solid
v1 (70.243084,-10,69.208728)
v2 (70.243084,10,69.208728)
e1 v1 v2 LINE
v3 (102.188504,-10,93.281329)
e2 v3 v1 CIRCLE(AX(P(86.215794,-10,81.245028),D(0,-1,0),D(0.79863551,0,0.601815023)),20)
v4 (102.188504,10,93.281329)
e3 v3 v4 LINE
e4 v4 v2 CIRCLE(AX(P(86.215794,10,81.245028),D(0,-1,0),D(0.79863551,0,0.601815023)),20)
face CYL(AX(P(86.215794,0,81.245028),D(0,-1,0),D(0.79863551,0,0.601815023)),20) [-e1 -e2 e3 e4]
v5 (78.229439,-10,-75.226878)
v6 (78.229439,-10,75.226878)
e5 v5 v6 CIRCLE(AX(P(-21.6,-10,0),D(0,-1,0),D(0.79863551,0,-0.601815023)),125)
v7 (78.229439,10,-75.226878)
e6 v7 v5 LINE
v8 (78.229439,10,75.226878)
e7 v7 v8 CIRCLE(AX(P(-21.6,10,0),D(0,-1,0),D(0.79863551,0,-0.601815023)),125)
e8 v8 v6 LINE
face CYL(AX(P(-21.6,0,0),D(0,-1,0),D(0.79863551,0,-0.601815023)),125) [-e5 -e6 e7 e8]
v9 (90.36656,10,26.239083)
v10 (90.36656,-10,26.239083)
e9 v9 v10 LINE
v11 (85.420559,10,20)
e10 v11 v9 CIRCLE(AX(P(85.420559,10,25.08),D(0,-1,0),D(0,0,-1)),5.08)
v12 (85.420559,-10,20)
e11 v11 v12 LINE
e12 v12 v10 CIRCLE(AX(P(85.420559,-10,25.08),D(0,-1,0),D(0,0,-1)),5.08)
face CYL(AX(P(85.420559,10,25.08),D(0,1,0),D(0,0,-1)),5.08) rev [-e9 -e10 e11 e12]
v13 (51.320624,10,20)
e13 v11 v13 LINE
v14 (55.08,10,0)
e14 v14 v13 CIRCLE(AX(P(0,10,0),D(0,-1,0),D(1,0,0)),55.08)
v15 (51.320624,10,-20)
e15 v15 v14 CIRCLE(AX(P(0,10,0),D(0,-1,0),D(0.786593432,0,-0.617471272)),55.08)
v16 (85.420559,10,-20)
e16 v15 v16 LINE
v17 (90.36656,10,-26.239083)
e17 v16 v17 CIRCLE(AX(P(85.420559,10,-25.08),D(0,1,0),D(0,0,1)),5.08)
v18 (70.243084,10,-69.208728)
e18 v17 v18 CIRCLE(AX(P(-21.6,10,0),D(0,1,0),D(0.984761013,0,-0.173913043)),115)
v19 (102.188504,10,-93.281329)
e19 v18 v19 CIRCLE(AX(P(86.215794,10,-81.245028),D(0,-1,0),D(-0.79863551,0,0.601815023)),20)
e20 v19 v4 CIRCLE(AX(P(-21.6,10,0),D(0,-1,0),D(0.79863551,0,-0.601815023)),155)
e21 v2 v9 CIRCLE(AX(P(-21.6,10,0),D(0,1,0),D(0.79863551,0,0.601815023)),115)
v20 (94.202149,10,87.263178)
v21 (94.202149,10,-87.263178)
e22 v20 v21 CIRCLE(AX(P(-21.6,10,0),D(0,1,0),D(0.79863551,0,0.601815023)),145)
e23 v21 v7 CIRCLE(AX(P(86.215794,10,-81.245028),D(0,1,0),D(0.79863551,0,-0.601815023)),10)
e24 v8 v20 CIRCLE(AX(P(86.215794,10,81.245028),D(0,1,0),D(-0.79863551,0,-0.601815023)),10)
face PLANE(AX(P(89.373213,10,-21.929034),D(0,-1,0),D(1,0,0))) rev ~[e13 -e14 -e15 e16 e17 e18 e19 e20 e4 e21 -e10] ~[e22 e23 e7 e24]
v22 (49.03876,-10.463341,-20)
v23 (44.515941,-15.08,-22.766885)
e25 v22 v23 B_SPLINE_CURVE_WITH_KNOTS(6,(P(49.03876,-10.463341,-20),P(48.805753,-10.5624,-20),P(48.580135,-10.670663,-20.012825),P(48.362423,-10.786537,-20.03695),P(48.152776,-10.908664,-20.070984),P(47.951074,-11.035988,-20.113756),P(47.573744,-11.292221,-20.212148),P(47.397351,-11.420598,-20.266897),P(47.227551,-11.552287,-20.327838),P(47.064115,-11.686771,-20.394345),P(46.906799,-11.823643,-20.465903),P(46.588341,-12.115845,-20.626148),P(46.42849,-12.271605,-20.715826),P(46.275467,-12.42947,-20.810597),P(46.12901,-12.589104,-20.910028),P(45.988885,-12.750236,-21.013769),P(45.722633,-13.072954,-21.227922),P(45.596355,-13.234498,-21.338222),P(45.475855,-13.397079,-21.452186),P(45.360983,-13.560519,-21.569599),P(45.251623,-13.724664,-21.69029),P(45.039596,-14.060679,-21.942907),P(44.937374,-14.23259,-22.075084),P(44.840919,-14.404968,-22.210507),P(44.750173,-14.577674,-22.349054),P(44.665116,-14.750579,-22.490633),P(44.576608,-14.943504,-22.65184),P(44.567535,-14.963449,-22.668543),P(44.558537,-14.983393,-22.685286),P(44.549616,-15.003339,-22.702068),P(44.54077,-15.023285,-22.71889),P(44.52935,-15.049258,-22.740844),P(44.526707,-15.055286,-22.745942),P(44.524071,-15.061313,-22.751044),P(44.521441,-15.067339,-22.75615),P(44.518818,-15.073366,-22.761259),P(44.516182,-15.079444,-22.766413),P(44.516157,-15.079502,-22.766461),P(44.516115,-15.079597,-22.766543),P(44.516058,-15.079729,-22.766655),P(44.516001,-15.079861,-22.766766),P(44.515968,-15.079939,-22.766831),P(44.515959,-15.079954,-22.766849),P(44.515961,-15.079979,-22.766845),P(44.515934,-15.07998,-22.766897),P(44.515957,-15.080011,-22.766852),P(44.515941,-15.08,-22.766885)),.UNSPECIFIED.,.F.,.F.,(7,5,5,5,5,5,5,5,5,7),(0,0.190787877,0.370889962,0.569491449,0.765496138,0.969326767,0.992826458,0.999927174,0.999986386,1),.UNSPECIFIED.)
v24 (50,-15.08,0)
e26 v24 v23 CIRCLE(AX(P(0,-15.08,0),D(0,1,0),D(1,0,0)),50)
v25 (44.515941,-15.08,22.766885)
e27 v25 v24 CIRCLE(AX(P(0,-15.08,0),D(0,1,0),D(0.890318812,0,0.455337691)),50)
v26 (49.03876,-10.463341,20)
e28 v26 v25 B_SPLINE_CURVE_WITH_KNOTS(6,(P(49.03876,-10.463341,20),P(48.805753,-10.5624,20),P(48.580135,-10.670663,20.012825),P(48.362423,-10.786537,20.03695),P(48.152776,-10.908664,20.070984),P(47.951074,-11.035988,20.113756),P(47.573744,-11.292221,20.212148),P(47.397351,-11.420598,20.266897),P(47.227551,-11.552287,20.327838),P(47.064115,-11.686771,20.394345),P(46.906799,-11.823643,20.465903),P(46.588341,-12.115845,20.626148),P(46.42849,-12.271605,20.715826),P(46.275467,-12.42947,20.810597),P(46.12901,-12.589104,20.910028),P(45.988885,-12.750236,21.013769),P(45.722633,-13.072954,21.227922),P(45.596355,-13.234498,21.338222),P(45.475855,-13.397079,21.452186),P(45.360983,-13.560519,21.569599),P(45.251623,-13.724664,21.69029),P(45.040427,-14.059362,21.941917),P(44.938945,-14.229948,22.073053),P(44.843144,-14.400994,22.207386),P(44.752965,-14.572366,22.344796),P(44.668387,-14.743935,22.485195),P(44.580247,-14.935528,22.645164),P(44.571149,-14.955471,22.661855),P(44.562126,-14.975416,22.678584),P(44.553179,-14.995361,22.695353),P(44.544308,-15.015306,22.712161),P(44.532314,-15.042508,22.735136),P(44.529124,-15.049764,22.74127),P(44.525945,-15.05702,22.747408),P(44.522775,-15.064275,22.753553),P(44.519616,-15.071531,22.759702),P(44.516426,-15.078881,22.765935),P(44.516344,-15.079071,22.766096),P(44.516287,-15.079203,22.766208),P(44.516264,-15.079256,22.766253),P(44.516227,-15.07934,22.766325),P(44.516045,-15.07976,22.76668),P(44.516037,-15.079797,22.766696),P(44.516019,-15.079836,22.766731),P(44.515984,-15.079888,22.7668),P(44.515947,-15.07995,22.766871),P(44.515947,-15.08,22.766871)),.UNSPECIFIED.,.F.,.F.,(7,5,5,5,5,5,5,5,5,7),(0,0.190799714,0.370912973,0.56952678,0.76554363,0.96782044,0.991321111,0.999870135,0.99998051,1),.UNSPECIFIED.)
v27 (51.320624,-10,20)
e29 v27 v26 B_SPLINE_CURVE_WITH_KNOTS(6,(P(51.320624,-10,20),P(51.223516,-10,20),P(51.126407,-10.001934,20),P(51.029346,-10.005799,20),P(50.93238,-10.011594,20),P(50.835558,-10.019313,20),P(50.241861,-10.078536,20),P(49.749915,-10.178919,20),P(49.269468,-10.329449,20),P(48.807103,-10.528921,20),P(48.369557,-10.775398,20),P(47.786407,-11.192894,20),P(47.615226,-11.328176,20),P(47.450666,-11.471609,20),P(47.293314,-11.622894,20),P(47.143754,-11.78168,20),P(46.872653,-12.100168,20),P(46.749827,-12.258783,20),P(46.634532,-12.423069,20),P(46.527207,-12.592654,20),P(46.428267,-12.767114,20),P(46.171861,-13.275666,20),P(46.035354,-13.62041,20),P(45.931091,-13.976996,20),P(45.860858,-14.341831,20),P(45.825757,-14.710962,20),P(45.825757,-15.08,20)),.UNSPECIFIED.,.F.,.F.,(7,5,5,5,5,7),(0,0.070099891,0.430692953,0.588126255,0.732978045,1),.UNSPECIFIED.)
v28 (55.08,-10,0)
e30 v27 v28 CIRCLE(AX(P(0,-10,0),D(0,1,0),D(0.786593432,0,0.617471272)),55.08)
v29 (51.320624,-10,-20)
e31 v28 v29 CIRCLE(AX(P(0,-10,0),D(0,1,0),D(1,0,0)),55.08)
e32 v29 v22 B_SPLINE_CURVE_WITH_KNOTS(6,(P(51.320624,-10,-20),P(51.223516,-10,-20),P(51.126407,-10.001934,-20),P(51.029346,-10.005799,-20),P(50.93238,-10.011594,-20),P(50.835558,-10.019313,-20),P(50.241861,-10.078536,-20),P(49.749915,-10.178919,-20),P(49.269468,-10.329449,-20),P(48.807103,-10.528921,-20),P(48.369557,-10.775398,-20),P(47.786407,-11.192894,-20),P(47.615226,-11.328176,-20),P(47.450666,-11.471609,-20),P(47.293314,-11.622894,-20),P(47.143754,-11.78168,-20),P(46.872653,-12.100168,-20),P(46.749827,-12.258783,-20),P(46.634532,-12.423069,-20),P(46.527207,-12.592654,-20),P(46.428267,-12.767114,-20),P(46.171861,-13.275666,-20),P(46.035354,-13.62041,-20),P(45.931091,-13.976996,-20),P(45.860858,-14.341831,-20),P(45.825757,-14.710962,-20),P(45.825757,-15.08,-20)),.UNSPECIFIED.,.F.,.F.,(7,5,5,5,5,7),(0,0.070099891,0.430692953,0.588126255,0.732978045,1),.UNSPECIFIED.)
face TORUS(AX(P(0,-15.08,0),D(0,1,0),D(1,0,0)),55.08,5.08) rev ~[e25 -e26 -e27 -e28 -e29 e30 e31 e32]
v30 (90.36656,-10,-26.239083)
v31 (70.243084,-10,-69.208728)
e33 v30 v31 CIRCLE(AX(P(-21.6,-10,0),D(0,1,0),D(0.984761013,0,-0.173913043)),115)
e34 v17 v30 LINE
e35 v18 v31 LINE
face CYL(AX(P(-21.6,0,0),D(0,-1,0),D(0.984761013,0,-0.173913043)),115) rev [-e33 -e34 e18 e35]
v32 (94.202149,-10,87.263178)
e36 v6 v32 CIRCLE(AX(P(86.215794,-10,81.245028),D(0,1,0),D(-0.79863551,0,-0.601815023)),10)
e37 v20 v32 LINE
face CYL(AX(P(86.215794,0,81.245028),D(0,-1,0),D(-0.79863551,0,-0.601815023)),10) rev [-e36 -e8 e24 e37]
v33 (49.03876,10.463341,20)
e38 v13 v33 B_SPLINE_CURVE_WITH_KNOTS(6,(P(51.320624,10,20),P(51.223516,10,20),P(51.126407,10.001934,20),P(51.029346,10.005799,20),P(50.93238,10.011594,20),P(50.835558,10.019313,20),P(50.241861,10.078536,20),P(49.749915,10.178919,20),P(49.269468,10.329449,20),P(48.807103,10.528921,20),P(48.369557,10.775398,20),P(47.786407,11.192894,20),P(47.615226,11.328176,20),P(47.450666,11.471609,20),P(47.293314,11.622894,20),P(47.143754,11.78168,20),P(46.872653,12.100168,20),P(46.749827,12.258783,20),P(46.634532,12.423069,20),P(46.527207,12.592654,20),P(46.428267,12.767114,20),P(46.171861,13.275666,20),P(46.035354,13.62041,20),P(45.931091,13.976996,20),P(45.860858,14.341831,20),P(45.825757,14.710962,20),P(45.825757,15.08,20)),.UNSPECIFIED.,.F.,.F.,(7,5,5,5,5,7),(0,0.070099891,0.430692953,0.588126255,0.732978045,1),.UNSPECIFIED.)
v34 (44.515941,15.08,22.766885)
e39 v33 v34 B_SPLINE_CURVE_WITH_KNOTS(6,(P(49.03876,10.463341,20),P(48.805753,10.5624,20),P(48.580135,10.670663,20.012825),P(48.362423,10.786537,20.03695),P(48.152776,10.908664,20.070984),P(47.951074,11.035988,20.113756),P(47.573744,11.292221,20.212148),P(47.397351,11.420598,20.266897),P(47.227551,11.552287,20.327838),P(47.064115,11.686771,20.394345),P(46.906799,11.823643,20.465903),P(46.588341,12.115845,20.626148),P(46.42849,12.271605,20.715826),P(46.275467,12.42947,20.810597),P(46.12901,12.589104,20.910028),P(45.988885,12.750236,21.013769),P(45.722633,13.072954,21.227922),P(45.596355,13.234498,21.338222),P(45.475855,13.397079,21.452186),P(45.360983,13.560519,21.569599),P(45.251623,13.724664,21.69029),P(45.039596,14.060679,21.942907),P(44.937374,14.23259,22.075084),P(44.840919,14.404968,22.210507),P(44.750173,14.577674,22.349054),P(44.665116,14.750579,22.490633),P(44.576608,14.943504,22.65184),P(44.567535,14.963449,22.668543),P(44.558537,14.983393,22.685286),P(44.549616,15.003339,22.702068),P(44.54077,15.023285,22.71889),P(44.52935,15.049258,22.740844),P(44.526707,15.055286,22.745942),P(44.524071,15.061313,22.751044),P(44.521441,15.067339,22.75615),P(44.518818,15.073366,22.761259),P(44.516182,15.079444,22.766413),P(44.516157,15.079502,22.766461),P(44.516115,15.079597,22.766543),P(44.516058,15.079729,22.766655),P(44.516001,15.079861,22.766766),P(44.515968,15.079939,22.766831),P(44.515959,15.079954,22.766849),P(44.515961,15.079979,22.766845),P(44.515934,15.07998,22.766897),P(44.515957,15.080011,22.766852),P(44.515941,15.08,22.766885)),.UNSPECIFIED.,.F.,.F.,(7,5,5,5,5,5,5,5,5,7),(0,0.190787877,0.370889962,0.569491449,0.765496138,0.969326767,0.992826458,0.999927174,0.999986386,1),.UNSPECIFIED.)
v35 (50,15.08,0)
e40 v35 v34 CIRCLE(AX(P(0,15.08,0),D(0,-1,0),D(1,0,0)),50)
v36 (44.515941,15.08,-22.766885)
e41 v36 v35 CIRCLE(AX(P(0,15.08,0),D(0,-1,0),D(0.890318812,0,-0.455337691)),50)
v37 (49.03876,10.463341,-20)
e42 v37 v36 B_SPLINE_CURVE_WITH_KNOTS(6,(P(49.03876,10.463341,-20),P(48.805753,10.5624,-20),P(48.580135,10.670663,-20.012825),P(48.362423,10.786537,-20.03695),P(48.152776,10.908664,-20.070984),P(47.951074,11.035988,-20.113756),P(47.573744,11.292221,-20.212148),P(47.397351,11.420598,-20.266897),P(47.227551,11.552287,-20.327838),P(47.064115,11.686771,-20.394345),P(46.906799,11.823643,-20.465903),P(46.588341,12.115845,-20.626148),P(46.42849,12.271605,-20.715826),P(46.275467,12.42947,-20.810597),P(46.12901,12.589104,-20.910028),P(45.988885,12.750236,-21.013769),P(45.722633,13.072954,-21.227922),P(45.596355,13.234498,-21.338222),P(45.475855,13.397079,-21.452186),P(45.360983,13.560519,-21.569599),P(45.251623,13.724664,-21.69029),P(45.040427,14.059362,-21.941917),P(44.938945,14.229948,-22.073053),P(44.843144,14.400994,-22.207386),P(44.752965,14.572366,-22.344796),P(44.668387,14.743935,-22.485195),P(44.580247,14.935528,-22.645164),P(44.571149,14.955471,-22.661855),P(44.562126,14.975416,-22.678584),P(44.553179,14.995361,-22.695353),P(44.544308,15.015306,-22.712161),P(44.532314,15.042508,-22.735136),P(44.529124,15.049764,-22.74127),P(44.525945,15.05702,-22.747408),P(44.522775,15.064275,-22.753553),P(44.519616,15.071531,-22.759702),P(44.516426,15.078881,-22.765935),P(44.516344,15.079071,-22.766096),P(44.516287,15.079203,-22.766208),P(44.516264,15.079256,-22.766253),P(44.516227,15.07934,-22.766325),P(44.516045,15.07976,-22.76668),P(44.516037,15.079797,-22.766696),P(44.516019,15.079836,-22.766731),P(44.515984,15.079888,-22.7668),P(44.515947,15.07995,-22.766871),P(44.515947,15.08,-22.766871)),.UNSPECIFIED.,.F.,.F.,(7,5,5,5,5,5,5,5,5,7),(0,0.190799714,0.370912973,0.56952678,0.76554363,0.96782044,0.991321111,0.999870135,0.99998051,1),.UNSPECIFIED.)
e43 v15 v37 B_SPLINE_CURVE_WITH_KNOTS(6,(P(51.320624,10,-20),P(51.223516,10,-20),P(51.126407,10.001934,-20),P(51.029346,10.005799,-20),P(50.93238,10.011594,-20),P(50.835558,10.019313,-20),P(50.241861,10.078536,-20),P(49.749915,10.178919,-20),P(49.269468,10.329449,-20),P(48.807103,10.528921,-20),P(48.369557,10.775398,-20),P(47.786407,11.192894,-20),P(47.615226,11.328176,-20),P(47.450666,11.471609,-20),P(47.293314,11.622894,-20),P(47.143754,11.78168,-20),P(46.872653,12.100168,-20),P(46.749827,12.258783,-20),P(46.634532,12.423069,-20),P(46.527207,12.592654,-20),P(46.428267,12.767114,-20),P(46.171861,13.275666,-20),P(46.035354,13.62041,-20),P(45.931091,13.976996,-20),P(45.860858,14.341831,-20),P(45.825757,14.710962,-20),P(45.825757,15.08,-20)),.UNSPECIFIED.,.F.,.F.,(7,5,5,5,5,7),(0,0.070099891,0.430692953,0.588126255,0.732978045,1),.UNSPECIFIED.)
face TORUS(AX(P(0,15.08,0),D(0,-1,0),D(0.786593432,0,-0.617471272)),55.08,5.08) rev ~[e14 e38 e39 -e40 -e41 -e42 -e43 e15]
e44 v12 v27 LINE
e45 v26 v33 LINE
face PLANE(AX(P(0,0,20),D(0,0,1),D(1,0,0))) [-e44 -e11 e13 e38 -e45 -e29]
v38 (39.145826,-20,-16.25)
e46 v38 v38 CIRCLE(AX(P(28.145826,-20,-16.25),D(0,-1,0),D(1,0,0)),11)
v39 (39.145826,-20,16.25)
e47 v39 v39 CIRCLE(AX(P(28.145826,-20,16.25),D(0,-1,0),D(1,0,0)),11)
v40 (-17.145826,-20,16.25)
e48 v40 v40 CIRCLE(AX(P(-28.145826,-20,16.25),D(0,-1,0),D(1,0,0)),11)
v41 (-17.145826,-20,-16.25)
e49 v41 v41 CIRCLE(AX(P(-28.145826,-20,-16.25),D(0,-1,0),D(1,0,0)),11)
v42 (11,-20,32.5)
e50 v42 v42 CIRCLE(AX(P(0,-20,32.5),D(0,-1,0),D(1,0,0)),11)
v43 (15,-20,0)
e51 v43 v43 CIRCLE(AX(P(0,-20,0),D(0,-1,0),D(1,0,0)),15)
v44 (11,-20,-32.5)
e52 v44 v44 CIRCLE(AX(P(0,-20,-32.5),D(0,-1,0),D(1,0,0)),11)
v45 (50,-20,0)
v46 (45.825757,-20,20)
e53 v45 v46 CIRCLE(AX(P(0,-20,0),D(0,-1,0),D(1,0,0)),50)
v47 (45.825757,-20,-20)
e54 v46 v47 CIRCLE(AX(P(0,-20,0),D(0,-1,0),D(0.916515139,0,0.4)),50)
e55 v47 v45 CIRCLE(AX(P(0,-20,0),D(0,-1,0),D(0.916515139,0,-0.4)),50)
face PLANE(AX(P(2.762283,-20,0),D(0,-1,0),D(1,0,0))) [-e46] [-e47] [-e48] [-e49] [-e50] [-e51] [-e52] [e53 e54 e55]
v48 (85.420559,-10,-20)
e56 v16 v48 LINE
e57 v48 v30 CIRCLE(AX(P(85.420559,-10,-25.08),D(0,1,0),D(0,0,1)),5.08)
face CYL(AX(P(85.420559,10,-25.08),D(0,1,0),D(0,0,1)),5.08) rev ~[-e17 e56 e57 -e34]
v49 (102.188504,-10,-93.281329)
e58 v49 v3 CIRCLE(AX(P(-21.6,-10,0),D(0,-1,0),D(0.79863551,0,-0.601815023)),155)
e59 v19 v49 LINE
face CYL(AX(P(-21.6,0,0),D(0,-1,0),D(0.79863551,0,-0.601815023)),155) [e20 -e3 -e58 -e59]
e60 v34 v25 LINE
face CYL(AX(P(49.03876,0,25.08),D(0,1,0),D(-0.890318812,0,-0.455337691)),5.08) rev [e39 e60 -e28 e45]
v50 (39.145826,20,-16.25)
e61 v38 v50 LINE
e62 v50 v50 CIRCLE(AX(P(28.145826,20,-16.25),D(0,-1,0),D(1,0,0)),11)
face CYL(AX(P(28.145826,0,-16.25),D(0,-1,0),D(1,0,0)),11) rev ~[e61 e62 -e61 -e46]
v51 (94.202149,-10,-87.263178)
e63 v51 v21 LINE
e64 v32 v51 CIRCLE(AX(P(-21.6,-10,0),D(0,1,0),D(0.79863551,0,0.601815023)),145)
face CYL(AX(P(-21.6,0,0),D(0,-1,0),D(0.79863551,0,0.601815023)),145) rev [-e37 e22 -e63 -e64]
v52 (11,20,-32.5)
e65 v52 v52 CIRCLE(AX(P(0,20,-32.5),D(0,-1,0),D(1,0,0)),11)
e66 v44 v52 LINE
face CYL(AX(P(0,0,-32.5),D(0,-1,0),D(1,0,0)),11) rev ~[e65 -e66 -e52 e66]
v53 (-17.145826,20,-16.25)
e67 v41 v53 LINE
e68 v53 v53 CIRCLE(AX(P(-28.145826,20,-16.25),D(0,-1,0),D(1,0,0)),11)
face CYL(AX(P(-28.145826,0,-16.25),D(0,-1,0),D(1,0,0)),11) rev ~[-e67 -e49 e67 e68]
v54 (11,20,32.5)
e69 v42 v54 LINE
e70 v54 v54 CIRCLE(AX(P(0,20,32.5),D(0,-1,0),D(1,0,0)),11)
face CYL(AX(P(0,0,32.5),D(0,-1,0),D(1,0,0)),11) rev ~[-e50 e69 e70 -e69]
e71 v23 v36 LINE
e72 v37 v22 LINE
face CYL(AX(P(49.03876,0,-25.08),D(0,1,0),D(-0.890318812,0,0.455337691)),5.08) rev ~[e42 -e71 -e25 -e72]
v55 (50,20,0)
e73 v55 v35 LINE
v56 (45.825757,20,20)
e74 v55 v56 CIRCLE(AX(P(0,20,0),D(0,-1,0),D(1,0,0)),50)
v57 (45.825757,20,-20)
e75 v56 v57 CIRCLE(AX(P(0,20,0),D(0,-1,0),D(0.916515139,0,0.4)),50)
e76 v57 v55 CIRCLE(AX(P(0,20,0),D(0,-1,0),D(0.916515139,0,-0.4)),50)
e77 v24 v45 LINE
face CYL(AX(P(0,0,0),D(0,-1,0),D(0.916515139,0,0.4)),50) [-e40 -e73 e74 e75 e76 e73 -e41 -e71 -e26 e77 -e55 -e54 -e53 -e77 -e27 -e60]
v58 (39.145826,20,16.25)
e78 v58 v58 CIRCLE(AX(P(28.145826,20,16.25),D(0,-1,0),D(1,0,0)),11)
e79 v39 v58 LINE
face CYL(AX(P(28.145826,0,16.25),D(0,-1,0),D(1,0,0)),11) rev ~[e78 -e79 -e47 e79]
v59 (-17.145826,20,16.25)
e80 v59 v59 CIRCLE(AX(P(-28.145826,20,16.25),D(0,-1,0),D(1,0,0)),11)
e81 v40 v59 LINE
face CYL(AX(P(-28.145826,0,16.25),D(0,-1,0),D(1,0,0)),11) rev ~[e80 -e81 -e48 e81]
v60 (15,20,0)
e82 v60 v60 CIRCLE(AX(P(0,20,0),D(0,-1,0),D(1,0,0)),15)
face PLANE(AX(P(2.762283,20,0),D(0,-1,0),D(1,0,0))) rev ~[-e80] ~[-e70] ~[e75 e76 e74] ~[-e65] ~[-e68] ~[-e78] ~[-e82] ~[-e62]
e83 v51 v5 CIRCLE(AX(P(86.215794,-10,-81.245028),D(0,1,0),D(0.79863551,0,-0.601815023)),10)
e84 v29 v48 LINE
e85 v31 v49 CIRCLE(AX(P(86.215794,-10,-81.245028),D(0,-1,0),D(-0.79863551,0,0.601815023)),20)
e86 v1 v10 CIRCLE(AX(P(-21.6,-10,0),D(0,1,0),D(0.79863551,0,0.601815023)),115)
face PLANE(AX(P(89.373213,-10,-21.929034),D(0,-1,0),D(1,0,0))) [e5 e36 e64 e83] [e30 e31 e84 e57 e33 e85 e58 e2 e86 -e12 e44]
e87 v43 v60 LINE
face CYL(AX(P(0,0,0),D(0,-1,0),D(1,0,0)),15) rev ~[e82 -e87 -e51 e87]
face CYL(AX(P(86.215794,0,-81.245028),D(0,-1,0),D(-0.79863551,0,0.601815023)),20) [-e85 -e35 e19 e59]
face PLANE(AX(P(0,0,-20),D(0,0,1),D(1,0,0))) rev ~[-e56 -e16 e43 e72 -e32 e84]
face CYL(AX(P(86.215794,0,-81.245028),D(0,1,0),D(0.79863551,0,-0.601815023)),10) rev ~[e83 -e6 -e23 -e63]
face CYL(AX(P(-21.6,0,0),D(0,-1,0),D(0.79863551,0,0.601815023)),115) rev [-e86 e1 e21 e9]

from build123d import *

# Parameters (mm, degrees)
F0_R         = 11
F0_R_2       = 15
F1_DEPTH     = 20
F2_DEPTH     = 10
F3_T1_DEPTH  = 10
F3_T3_DEPTH  = 10
F3_T5_DEPTH  = 20
F3_T10_ANGLE = 38.1317076079
F3_T15_ANGLE = 38.1317076079
F3_T20_ANGLE = 38.1317076079
F3_T25_ANGLE = 38.1317076079
F3_T31_DEPTH = 18.0325080763
F3_T35_ANGLE = 38.1317076079
F3_T42_DEPTH = 18.0325080763
F3_T46_ANGLE = 38.1317076079
F3_T53_DEPTH = 18.0325080763
F3_T57_ANGLE = 38.1317076079
F3_T64_DEPTH = 18.0325080763
F3_T68_ANGLE = 38.1317076079


# Not quite as in the source:
# - a fillet or chamfer that OpenCascade refuses, or shapes differently, is made with other operations: its cross-section is extruded or revolved along the edge and cut away or added


with BuildPart() as f1:
    # F0 (on Front) → F1 (new body, symmetric)
    with BuildSketch(Plane.XZ):
        with BuildLine():
            ThreePointArc((45.8257569496, -20), (48.9453156465, -10.2154821845), (50, 0))
            ThreePointArc((50, 0), (48.9453156465, 10.2154821845), (45.8257569496, 20))
            ThreePointArc((45.8257569496, 20), (-50, 0), (45.8257569496, -20))
        make_face()
        with Locations((-28.145825623, -16.25)):
            Circle(F0_R, mode=Mode.SUBTRACT)
        with Locations((0, -32.5)):
            Circle(F0_R, mode=Mode.SUBTRACT)
        with Locations((28.145825623, -16.25)):
            Circle(F0_R, mode=Mode.SUBTRACT)
        with Locations((-28.145825623, 16.25)):
            Circle(F0_R, mode=Mode.SUBTRACT)
        Circle(F0_R_2, mode=Mode.SUBTRACT)
        with Locations((28.145825623, 16.25)):
            Circle(F0_R, mode=Mode.SUBTRACT)
        with Locations((0, 32.5)):
            Circle(F0_R, mode=Mode.SUBTRACT)
    extrude(amount=F1_DEPTH, both=True)

    # F0 (on Front) → F2 (join, symmetric)
    with BuildSketch(Plane.XZ):
        with BuildLine():
            ThreePointArc((45.8257569496, -20), (48.9453156465, -10.2154821845), (50, 0))
            ThreePointArc((50, 0), (48.9453156465, 10.2154821845), (45.8257569496, 20))
            ThreePointArc((45.8257569496, 20), (-50, 0), (45.8257569496, -20))
        make_face()
        with Locations((-28.145825623, -16.25)):
            Circle(F0_R, mode=Mode.SUBTRACT)
        with Locations((0, -32.5)):
            Circle(F0_R, mode=Mode.SUBTRACT)
        with Locations((28.145825623, -16.25)):
            Circle(F0_R, mode=Mode.SUBTRACT)
        with Locations((-28.145825623, 16.25)):
            Circle(F0_R, mode=Mode.SUBTRACT)
        Circle(F0_R_2, mode=Mode.SUBTRACT)
        with Locations((28.145825623, 16.25)):
            Circle(F0_R, mode=Mode.SUBTRACT)
        with Locations((0, 32.5)):
            Circle(F0_R, mode=Mode.SUBTRACT)
        with BuildLine():
            ThreePointArc((45.8257569496, 20), (48.9453156465, 10.2154821845), (50, 0))
            ThreePointArc((50, 0), (48.9453156465, -10.2154821845), (45.8257569496, -20))
            Line((45.8257569496, -20), (91.6475165291, -20))
            ThreePointArc((91.6475165291, -20), (83.8557409084, -45.8703249329), (70.2430836554, -69.2087276625))
            ThreePointArc((70.2430836554, -69.2087276625), (74.1794933933, -97.2177383265), (102.1885040573, -93.2813285886))
            ThreePointArc((102.1885040573, -93.2813285886), (133.4, 0), (102.1885040573, 93.2813285886))
            ThreePointArc((102.1885040573, 93.2813285886), (74.1794933933, 97.2177383265), (70.2430836554, 69.2087276625))
            ThreePointArc((70.2430836554, 69.2087276625), (83.8557409084, 45.8703249329), (91.6475165291, 20))
            Line((91.6475165291, 20), (45.8257569496, 20))
        make_face()
        with BuildLine():
            ThreePointArc((94.2021489569, -87.263178357), (80.1976436249, -89.231383226), (78.2294387559, -75.226877894))
            ThreePointArc((78.2294387559, -75.226877894), (103.4, 0), (78.2294387559, 75.226877894))
            ThreePointArc((78.2294387559, 75.226877894), (80.1976436249, 89.231383226), (94.2021489569, 87.263178357))
            ThreePointArc((94.2021489569, 87.263178357), (123.4, 0), (94.2021489569, -87.263178357))
        make_face(mode=Mode.SUBTRACT)
    extrude(amount=F2_DEPTH, both=True)

    # F3: fillet of radius 5.08 on 10 edges, made by hand

    # F3_s2 → F3_t1 (join)
    with BuildSketch(Plane.XZ.offset(-10)):
        with BuildLine():
            ThreePointArc((44.5159406137, 22.7668845316), (46.3877440145, 20.7465818007), (49.0387601801, 20))
            Line((49.0387601801, 20), (45.8257569496, 20))
            ThreePointArc((45.8257569496, 20), (45.1920290777, 21.3934688128), (44.5159406137, 22.7668845316))
        make_face()
        with BuildLine():
            ThreePointArc((44.5159406137, -22.7668845316), (46.3877440145, -20.7465818007), (49.0387601801, -20))
            Line((49.0387601801, -20), (45.8257569496, -20))
            ThreePointArc((45.8257569496, -20), (45.1920290777, -21.3934688128), (44.5159406137, -22.7668845316))
        make_face()
    extrude(amount=F3_T1_DEPTH)

    # F3_s4 → F3_t3 (join)
    with BuildSketch(Plane.XZ):
        with BuildLine():
            ThreePointArc((44.5159406137, 22.7668845316), (46.3877440145, 20.7465818007), (49.0387601801, 20))
            Line((49.0387601801, 20), (45.8257569496, 20))
            ThreePointArc((45.8257569496, 20), (45.1920290777, 21.3934688128), (44.5159406137, 22.7668845316))
        make_face()
        with BuildLine():
            ThreePointArc((44.5159406137, -22.7668845316), (46.3877440145, -20.7465818007), (49.0387601801, -20))
            Line((49.0387601801, -20), (45.8257569496, -20))
            ThreePointArc((45.8257569496, -20), (45.1920290777, -21.3934688128), (44.5159406137, -22.7668845316))
        make_face()
    extrude(amount=F3_T3_DEPTH)

    # F3_s6 → F3_t5 (join)
    with BuildSketch(Plane.XZ.offset(-10)):
        with BuildLine():
            ThreePointArc((85.4205587726, -20), (89.4014218376, -21.924191188), (90.3665598512, -26.2390829694))
            ThreePointArc((90.3665598512, -26.2390829694), (91.0502400753, -23.1284113368), (91.6475165291, -20))
            Line((91.6475165291, -20), (85.4205587726, -20))
        make_face()
        with BuildLine():
            ThreePointArc((85.4205587726, 20), (89.4014218376, 21.924191188), (90.3665598512, 26.2390829694))
            ThreePointArc((90.3665598512, 26.2390829694), (91.0502400753, 23.1284113368), (91.6475165291, 20))
            Line((91.6475165291, 20), (85.4205587726, 20))
        make_face()
    extrude(amount=F3_T5_DEPTH)


with BuildPart() as f3_tool8:
    # F3_s9 → F3_t10 (revolve)
    with BuildSketch(Plane(origin=(0, 0, 0), x_dir=(0, 1, 0), z_dir=(-0.6174712722, 0, -0.7865934325))):
        with BuildLine():
            ThreePointArc((10, 55.08), (11.4878975516, 51.4878975516), (15.08, 50))
            Line((15.08, 50), (10, 50))
            Line((10, 50), (10, 55.08))
        make_face()
    revolve(axis=Axis((0, 10, 0), (0, -1, 0)), revolution_arc=F3_T10_ANGLE)

    split(bisect_by=Plane.XY.offset(-20), keep=Keep.TOP)


with BuildPart() as f1_1:
    add(f1.part)

    # F3_t7: union F3_tool8
    add(f3_tool8.part)


with BuildPart() as f3_tool13:
    # F3_s14 → F3_t15 (revolve)
    with BuildSketch(Plane.XY):
        with BuildLine():
            ThreePointArc((55.08, 10), (51.4878975516, 11.4878975516), (50, 15.08))
            Line((50, 15.08), (50, 10))
            Line((50, 10), (55.08, 10))
        make_face()
    revolve(axis=Axis((0, 10, 0), (0, -1, 0)), revolution_arc=F3_T15_ANGLE)

    split(bisect_by=Plane.XY.offset(20), keep=Keep.BOTTOM)


with BuildPart() as f1_2:
    add(f1_1.part)

    # F3_t12: union F3_tool13
    add(f3_tool13.part)


with BuildPart() as f3_tool18:
    # F3_s19 → F3_t20 (revolve)
    with BuildSketch(Plane.XY):
        with BuildLine():
            ThreePointArc((55.08, -10), (51.4878975516, -11.4878975516), (50, -15.08))
            Line((50, -15.08), (50, -10))
            Line((50, -10), (55.08, -10))
        make_face()
    revolve(axis=Axis((0, -10, 0), (0, 1, 0)), revolution_arc=F3_T20_ANGLE)

    split(bisect_by=Plane.XY.offset(-20), keep=Keep.TOP)


with BuildPart() as f1_3:
    add(f1_2.part)

    # F3_t17: union F3_tool18
    add(f3_tool18.part)


with BuildPart() as f3_tool23:
    # F3_s24 → F3_t25 (revolve)
    with BuildSketch(Plane(origin=(0, 0, 0), x_dir=(0, 1, 0), z_dir=(-0.6174712722, 0, 0.7865934325))):
        with BuildLine():
            ThreePointArc((-10, -55.08), (-11.4878975516, -51.4878975516), (-15.08, -50))
            Line((-15.08, -50), (-10, -50))
            Line((-10, -50), (-10, -55.08))
        make_face()
    revolve(axis=Axis((0, -10, 0), (0, 1, 0)), revolution_arc=F3_T25_ANGLE)

    split(bisect_by=Plane.XY.offset(20), keep=Keep.BOTTOM)


with BuildPart() as f1_4:
    add(f1_3.part)

    # F3_t22: union F3_tool23
    add(f3_tool23.part)


with BuildPart() as f3_tool29:
    # F3_s30 → F3_t31 (new body)
    with BuildSketch(Plane.XZ):
        with BuildLine():
            ThreePointArc((44.5159406137, 22.7668845316), (46.3877440145, 20.7465818007), (49.0387601801, 20))
            Line((49.0387601801, 20), (45.8257569496, 20))
            ThreePointArc((45.8257569496, 20), (45.1920290777, 21.3934688128), (44.5159406137, 22.7668845316))
        make_face()
    extrude(amount=-F3_T31_DEPTH)

    split(bisect_by=Plane.XZ.offset(-10), keep=Keep.BOTTOM)


with BuildPart() as f3_tool33:
    # F3_s34 → F3_t35 (revolve)
    with BuildSketch(Plane.XY):
        with BuildLine():
            ThreePointArc((55.08, 10), (51.4878975516, 11.4878975516), (50, 15.08))
            Line((50, 15.08), (50, 10))
            Line((50, 10), (55.08, 10))
        make_face()
    revolve(axis=Axis((0, 10, 0), (0, -1, 0)), revolution_arc=F3_T35_ANGLE)

    split(bisect_by=Plane.XY.offset(20), keep=Keep.TOP)


with BuildPart() as f3_tool29_1:
    add(f3_tool29.part)

    # F3_t37: intersect F3_tool33
    add(f3_tool33.part, mode=Mode.INTERSECT)


with BuildPart() as f1_5:
    add(f1_4.part)

    # F3_t27: union F3_tool29
    add(f3_tool29_1.part)


with BuildPart() as f3_tool40:
    # F3_s41 → F3_t42 (new body)
    with BuildSketch(Plane.XZ):
        with BuildLine():
            ThreePointArc((44.5159406137, 22.7668845316), (46.3877440145, 20.7465818007), (49.0387601801, 20))
            Line((49.0387601801, 20), (45.8257569496, 20))
            ThreePointArc((45.8257569496, 20), (45.1920290777, 21.3934688128), (44.5159406137, 22.7668845316))
        make_face()
    extrude(amount=F3_T42_DEPTH)

    split(bisect_by=Plane.XZ.offset(10), keep=Keep.TOP)


with BuildPart() as f3_tool44:
    # F3_s45 → F3_t46 (revolve)
    with BuildSketch(Plane(origin=(0, 0, 0), x_dir=(0, 1, 0), z_dir=(-0.6174712722, 0, 0.7865934325))):
        with BuildLine():
            ThreePointArc((-10, -55.08), (-11.4878975516, -51.4878975516), (-15.08, -50))
            Line((-15.08, -50), (-10, -50))
            Line((-10, -50), (-10, -55.08))
        make_face()
    revolve(axis=Axis((0, -10, 0), (0, 1, 0)), revolution_arc=F3_T46_ANGLE)

    split(bisect_by=Plane.XY.offset(20), keep=Keep.TOP)


with BuildPart() as f3_tool40_1:
    add(f3_tool40.part)

    # F3_t48: intersect F3_tool44
    add(f3_tool44.part, mode=Mode.INTERSECT)


with BuildPart() as f1_6:
    add(f1_5.part)

    # F3_t38: union F3_tool40
    add(f3_tool40_1.part)


with BuildPart() as f3_tool51:
    # F3_s52 → F3_t53 (new body)
    with BuildSketch(Plane.XZ):
        with BuildLine():
            ThreePointArc((44.5159406137, -22.7668845316), (46.3877440145, -20.7465818007), (49.0387601801, -20))
            Line((49.0387601801, -20), (45.8257569496, -20))
            ThreePointArc((45.8257569496, -20), (45.1920290777, -21.3934688128), (44.5159406137, -22.7668845316))
        make_face()
    extrude(amount=-F3_T53_DEPTH)

    split(bisect_by=Plane.XZ.offset(-10), keep=Keep.BOTTOM)


with BuildPart() as f3_tool55:
    # F3_s56 → F3_t57 (revolve)
    with BuildSketch(Plane(origin=(0, 0, 0), x_dir=(0, 1, 0), z_dir=(-0.6174712722, 0, -0.7865934325))):
        with BuildLine():
            ThreePointArc((10, 55.08), (11.4878975516, 51.4878975516), (15.08, 50))
            Line((15.08, 50), (10, 50))
            Line((10, 50), (10, 55.08))
        make_face()
    revolve(axis=Axis((0, 10, 0), (0, -1, 0)), revolution_arc=F3_T57_ANGLE)

    split(bisect_by=Plane.XY.offset(-20), keep=Keep.BOTTOM)


with BuildPart() as f3_tool51_1:
    add(f3_tool51.part)

    # F3_t59: intersect F3_tool55
    add(f3_tool55.part, mode=Mode.INTERSECT)


with BuildPart() as f1_7:
    add(f1_6.part)

    # F3_t49: union F3_tool51
    add(f3_tool51_1.part)


with BuildPart() as f3_tool62:
    # F3_s63 → F3_t64 (new body)
    with BuildSketch(Plane.XZ):
        with BuildLine():
            ThreePointArc((44.5159406137, -22.7668845316), (46.3877440145, -20.7465818007), (49.0387601801, -20))
            Line((49.0387601801, -20), (45.8257569496, -20))
            ThreePointArc((45.8257569496, -20), (45.1920290777, -21.3934688128), (44.5159406137, -22.7668845316))
        make_face()
    extrude(amount=F3_T64_DEPTH)

    split(bisect_by=Plane.XZ.offset(10), keep=Keep.TOP)


with BuildPart() as f3_tool66:
    # F3_s67 → F3_t68 (revolve)
    with BuildSketch(Plane.XY):
        with BuildLine():
            ThreePointArc((55.08, -10), (51.4878975516, -11.4878975516), (50, -15.08))
            Line((50, -15.08), (50, -10))
            Line((50, -10), (55.08, -10))
        make_face()
    revolve(axis=Axis((0, -10, 0), (0, 1, 0)), revolution_arc=F3_T68_ANGLE)

    split(bisect_by=Plane.XY.offset(-20), keep=Keep.BOTTOM)


with BuildPart() as f3_tool62_1:
    add(f3_tool62.part)

    # F3_t70: intersect F3_tool66
    add(f3_tool66.part, mode=Mode.INTERSECT)


with BuildPart() as f1_8:
    add(f1_7.part)

    # F3_t60: union F3_tool62
    add(f3_tool62_1.part)


solid = f1_8.part
